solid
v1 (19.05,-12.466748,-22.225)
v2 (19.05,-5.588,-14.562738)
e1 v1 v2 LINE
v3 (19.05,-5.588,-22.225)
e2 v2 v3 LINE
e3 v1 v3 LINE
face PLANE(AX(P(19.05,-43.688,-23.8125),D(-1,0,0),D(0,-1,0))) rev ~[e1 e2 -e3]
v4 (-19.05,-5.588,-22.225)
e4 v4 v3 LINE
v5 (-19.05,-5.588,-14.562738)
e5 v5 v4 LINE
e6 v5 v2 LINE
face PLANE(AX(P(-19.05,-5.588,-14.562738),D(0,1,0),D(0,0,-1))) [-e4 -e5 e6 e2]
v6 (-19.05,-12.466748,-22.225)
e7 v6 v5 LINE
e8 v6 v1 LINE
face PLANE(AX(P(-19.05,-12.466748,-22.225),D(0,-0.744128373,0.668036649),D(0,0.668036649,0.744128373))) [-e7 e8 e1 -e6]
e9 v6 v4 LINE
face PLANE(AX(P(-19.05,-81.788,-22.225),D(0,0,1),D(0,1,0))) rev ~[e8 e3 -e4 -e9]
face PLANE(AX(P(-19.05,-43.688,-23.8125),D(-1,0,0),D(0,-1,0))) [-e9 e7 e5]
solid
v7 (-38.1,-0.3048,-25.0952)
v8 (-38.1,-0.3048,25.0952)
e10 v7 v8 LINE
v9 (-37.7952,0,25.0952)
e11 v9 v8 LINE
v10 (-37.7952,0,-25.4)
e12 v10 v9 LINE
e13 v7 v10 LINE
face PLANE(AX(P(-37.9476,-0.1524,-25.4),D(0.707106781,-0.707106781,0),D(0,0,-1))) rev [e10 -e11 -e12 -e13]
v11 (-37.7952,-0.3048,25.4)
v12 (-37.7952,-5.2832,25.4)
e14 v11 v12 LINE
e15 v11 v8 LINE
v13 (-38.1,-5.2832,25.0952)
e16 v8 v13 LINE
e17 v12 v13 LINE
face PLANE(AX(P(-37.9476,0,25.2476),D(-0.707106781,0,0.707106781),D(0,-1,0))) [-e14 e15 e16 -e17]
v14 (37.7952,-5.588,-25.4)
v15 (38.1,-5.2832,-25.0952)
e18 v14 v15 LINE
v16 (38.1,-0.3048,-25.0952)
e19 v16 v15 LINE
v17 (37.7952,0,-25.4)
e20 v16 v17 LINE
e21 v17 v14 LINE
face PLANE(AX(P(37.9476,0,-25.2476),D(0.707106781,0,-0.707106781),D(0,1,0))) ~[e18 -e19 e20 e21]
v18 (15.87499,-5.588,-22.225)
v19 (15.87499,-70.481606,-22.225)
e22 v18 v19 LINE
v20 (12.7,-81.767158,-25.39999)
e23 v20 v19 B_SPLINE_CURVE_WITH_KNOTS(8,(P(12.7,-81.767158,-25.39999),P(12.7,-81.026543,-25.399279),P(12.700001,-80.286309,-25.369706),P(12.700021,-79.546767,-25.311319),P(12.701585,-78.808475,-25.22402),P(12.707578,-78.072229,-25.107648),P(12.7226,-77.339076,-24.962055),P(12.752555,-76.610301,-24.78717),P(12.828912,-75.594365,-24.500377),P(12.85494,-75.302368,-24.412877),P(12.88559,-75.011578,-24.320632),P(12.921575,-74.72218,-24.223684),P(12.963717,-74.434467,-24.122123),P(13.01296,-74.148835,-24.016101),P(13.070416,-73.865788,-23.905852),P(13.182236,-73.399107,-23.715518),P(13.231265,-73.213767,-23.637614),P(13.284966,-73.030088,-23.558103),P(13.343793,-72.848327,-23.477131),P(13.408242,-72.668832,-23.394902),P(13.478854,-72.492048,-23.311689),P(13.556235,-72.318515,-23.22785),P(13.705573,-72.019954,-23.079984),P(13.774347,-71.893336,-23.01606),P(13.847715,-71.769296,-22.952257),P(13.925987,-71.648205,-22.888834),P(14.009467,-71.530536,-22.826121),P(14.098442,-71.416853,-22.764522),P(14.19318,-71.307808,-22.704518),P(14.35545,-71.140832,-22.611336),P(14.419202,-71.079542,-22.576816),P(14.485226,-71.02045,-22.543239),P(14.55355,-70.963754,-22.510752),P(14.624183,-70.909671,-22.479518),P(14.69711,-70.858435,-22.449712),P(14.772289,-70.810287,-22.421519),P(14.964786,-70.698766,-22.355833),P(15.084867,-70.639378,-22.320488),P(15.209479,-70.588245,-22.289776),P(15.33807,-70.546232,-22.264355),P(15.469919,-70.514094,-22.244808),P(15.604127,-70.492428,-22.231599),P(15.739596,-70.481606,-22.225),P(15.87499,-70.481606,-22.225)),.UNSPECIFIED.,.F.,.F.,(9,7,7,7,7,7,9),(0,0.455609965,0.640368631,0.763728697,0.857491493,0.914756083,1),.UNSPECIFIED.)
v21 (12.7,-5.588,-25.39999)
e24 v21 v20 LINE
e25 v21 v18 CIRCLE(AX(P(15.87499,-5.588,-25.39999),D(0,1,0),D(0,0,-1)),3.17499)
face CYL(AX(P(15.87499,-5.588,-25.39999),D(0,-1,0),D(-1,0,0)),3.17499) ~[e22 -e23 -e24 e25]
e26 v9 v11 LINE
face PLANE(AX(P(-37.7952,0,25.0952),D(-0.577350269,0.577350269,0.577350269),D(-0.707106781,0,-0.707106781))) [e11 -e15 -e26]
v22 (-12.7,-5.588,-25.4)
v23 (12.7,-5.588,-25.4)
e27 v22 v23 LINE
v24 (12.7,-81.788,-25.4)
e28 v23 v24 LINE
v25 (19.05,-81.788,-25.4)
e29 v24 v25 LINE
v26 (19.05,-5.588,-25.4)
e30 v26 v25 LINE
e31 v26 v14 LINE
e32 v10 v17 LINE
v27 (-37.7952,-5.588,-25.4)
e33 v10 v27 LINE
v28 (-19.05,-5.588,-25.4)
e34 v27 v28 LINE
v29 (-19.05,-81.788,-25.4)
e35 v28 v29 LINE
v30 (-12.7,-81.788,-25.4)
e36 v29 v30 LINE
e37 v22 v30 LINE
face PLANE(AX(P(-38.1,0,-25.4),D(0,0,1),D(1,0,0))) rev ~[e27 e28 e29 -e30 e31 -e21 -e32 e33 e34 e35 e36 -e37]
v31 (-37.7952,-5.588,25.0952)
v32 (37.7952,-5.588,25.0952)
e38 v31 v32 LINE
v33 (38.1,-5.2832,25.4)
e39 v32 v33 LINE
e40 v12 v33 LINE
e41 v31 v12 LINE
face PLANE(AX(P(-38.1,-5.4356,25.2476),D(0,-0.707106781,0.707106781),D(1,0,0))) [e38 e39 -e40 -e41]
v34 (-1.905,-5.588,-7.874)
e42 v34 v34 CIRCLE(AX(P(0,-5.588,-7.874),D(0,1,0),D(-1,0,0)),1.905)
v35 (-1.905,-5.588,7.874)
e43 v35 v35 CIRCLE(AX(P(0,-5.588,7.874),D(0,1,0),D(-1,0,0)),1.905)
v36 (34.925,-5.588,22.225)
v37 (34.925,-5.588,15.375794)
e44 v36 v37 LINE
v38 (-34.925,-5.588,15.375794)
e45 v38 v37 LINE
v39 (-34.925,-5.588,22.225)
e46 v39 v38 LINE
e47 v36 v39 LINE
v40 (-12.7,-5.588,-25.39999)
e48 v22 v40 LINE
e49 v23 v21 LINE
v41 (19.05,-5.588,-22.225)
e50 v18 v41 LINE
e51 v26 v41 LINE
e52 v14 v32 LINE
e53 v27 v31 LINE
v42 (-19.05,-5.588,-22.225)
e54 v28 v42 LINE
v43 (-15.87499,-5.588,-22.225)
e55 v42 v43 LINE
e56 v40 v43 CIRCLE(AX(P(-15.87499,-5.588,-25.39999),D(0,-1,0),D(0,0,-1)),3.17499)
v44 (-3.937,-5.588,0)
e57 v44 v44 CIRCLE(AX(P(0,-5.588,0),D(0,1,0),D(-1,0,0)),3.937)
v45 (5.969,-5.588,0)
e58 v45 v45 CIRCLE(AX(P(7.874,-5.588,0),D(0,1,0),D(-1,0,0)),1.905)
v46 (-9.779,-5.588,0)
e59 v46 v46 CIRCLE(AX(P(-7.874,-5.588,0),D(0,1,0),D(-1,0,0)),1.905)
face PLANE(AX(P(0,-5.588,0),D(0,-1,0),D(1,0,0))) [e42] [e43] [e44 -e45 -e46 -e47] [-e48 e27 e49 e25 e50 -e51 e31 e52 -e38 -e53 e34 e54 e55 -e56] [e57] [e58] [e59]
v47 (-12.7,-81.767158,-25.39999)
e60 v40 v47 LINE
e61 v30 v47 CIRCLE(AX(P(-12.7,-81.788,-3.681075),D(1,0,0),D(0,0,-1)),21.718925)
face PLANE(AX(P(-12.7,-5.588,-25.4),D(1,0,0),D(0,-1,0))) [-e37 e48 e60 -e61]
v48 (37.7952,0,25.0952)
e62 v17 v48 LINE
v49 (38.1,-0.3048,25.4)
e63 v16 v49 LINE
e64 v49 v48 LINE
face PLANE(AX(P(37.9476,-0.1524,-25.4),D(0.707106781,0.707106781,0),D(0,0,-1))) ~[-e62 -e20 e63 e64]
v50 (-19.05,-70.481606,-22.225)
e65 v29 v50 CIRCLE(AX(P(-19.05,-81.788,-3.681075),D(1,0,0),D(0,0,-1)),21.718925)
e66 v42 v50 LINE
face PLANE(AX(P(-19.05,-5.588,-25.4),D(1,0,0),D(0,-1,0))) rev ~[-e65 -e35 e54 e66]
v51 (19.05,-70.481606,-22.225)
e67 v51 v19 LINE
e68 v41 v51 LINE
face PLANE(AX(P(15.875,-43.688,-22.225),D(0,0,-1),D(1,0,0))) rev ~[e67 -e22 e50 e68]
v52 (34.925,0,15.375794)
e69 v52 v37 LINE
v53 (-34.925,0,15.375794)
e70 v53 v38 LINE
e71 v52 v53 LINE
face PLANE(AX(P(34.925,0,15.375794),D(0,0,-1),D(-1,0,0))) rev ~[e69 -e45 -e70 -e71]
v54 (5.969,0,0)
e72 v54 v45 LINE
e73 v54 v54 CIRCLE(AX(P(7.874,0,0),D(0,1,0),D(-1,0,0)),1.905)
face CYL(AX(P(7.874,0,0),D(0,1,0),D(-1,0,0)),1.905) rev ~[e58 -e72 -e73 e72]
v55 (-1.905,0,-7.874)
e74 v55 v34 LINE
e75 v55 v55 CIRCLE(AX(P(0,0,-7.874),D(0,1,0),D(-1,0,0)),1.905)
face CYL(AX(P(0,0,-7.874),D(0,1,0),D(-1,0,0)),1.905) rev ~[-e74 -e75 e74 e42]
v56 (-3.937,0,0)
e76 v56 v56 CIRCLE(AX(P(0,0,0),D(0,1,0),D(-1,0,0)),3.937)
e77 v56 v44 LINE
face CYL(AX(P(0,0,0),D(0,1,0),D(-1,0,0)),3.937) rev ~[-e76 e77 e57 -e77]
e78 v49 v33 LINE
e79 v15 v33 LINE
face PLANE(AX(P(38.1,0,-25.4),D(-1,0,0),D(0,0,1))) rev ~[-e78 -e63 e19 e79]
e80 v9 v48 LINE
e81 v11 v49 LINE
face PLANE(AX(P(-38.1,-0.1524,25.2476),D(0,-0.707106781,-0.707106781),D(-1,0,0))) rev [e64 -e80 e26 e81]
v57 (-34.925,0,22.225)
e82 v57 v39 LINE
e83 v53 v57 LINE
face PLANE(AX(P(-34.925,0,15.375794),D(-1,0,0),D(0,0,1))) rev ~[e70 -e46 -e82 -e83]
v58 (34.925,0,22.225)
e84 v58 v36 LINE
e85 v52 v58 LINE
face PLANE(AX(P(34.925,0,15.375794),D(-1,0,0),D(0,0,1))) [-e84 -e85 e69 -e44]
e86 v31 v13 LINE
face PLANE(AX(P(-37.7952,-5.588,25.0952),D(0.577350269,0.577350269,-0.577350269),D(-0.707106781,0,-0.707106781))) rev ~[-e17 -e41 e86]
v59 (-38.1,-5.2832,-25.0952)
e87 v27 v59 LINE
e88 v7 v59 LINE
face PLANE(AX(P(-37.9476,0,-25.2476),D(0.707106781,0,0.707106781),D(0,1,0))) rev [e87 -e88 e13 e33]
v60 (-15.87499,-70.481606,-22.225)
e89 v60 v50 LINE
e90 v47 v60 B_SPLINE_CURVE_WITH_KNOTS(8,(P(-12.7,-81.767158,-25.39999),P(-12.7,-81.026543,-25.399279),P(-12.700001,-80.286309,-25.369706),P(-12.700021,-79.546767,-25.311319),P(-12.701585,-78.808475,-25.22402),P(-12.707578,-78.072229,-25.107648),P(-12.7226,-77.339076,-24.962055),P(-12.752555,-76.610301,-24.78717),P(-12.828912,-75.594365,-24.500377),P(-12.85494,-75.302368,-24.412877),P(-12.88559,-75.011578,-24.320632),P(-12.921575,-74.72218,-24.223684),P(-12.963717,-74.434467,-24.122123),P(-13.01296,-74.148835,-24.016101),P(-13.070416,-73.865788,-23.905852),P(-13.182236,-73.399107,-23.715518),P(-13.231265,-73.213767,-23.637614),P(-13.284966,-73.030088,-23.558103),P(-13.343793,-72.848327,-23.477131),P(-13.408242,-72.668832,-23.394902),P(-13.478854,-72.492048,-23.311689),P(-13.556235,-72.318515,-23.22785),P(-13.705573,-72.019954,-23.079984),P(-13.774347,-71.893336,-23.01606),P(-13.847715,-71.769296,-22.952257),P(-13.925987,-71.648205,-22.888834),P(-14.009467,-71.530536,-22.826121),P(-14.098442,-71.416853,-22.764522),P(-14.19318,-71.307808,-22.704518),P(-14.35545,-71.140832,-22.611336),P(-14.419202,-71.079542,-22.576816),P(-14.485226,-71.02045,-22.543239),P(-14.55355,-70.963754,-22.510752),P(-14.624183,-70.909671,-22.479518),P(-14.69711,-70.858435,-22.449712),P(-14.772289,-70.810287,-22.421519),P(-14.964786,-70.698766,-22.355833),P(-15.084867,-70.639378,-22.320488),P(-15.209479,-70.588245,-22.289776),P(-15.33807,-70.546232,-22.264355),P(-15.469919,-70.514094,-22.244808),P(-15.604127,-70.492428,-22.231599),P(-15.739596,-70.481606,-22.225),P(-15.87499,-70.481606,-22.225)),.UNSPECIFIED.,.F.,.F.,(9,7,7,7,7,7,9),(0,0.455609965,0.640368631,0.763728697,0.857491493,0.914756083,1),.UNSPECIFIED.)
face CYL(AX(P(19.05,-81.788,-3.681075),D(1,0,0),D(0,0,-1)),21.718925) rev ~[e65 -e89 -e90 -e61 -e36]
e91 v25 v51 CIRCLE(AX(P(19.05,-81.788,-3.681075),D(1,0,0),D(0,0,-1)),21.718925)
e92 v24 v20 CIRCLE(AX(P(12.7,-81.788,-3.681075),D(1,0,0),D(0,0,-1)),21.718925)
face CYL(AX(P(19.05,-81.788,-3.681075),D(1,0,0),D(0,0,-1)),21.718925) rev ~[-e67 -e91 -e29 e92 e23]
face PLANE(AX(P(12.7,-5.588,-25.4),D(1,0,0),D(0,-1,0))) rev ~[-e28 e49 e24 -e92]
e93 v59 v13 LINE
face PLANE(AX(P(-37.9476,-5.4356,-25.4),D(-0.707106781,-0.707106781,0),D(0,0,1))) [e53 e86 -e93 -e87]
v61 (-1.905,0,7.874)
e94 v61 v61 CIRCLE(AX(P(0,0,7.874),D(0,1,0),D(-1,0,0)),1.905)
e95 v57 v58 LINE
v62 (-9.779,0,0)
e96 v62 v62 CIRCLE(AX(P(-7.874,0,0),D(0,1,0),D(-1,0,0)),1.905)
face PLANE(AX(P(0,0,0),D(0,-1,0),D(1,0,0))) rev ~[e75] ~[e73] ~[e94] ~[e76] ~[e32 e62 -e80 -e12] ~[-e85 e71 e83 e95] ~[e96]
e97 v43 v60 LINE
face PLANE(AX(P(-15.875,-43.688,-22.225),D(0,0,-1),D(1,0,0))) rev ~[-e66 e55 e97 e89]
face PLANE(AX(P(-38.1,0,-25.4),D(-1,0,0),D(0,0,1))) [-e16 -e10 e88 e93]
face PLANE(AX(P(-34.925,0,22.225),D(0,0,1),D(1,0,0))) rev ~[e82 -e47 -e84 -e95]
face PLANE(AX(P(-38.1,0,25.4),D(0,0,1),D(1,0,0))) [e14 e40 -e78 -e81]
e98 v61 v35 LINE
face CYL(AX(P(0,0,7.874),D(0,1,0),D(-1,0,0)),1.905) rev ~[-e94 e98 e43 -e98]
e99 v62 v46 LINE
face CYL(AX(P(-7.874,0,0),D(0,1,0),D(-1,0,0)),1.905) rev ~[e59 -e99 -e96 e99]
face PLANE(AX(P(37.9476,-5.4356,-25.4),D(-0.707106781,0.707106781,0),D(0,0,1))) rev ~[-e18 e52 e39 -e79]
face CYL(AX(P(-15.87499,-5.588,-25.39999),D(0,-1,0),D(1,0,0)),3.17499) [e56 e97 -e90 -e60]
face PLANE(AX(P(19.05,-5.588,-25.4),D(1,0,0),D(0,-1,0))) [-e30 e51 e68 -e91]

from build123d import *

# Parameters (mm, degrees)
F0_W      = 76.2
F0_H      = 50.8
F1_DEPTH  = 5.588
F2_W      = 6.35
F2_H      = 76.2
F3_DEPTH  = 3.175
F5_DEPTH  = 38.1
F6_W      = 47.7035964723
F6_H      = 3.175
F7_DEPTH  = 254
F8_R      = 3.937
F8_R_2    = 1.905
F9_DEPTH  = 25.4
F10_W     = 69.2231629074
F10_H     = 6.8492060885
F10_W_2   = 0.6268370926
F11_DEPTH = 25.4
F13_DEPTH = 254
F14_R     = 3.17499
F15_SIZE  = 0.3048


# Not quite as in the source:
# - a fillet or chamfer is up to 0.001 mm smaller than in the source, because OpenCascade refuses the exact size


with BuildPart() as f1:
    # F0 (on Front) → F1 (new body)
    with BuildSketch(Plane.XZ):
        Rectangle(F0_W, F0_H)
    extrude(amount=F1_DEPTH)

    # F2 (on face) → F3 (join)
    with BuildSketch(Plane(origin=(0, 0, -25.4), x_dir=(1, 0, 0), z_dir=(0, 0, -1))):
        with Locations((-15.875, 43.688)):
            Rectangle(F2_W, F2_H)
        with Locations((15.875, 43.688)):
            Rectangle(F2_W, F2_H)
    extrude(amount=-F3_DEPTH)

    # F8 (on face) → F9 (cut)
    with BuildSketch(Plane(origin=(0, 0, 0), x_dir=(-1, 0, 0), z_dir=(0, 1, 0))):
        Circle(F8_R)
        with Locations((0, 7.874)):
            Circle(F8_R_2)
        with Locations((0, -7.874)):
            Circle(F8_R_2)
        with Locations((7.874, 0)):
            Circle(F8_R_2)
        with Locations((-7.874, 0)):
            Circle(F8_R_2)
    extrude(amount=-F9_DEPTH, mode=Mode.SUBTRACT)

    # F10 (on face) → F11 (cut)
    with BuildSketch(Plane(origin=(0, 0, 0), x_dir=(-1, 0, 0), z_dir=(0, 1, 0))):
        with Locations((-0.3134185463, 18.8003969558)):
            Rectangle(F10_W, F10_H)
        with Locations((34.6115814537, 18.8003969558)):
            Rectangle(F10_W_2, F10_H)
    extrude(amount=-F11_DEPTH, mode=Mode.SUBTRACT)

    # F12 (on face) → F13 (cut)
    with BuildSketch(Plane.YZ.offset(19.05)):
        with BuildLine():
            ThreePointArc((-81.788, -25.4), (-75.9161354287, -24.5911900097), (-70.4816058278, -22.225))
            Line((-70.4816058278, -22.225), (-81.788, -22.225))
            Line((-81.788, -22.225), (-81.788, -25.4))
        make_face()
    extrude(amount=-F13_DEPTH, mode=Mode.SUBTRACT)

    # F14 (radius 3.175 in the source; OpenCascade refuses exactly that, so slightly less here)
    f14_edges = [f1.edges().sort_by_distance(p)[0] for p in [
        (-12.7, -38.034803, -22.225),
        (12.7, -38.034803, -22.225),
    ]]
    fillet(f14_edges, radius=F14_R)

    # F15
    f15_edges = [f1.edges().sort_by_distance(p)[0] for p in [
        (-38.1, -2.794, 25.4),
        (0, -5.588, 25.4),
        (-38.1, -5.588, 0),
        (38.1, -5.588, 0),
        (0, 0, 25.4),
        (38.1, 0, 0),
        (-38.1, 0, 0),
        (-38.1, -2.794, -25.4),
        (38.1, -2.794, -25.4),
    ]]
    chamfer(f15_edges, length=F15_SIZE)


with BuildPart() as f5:
    # F4 (on face) → F5 (new body)
    with BuildSketch(Plane(origin=(-19.05, 0, 0), x_dir=(0, -1, 0), z_dir=(-1, 0, 0))):
        Polygon((5.588, -22.225), (5.588, -25.4), (81.788, -25.4), (81.788, -22.225), (12.4667482451, -22.225), align=None)
        Polygon((5.588, -14.562738128), (5.588, -22.225), (12.4667482451, -22.225), align=None)
    extrude(amount=-F5_DEPTH)

    # F6 (on face) → F7 (cut)
    with BuildSketch(Plane(origin=(-19.05, 0, 0), x_dir=(0, -1, 0), z_dir=(-1, 0, 0))):
        with BuildLine():
            ThreePointArc((61.4126552725, -25.4), (57.2639609503, -24.038009454), (53.2915964723, -22.225))
            Line((53.2915964723, -22.225), (53.2915964723, -25.4))
            Line((53.2915964723, -25.4), (61.4126552725, -25.4))
        make_face()
        with BuildLine():
            Line((81.788, -22.225), (53.2915964723, -22.225))
            ThreePointArc((53.2915964723, -22.225), (57.2639609503, -24.038009454), (61.4126552725, -25.4))
            Line((61.4126552725, -25.4), (81.788, -25.4))
            Line((81.788, -25.4), (81.788, -22.225))
        make_face()
        with Locations((29.4397982361, -23.8125)):
            Rectangle(F6_W, F6_H)
        with BuildLine():
            Line((81.788, -25.4), (61.4126552725, -25.4))
            ThreePointArc((61.4126552725, -25.4), (71.6003276362, -26.7408633781), (81.788, -25.4))
        make_face()
    extrude(amount=-F7_DEPTH, mode=Mode.SUBTRACT)


solid = Compound([f1.part, f5.part])
